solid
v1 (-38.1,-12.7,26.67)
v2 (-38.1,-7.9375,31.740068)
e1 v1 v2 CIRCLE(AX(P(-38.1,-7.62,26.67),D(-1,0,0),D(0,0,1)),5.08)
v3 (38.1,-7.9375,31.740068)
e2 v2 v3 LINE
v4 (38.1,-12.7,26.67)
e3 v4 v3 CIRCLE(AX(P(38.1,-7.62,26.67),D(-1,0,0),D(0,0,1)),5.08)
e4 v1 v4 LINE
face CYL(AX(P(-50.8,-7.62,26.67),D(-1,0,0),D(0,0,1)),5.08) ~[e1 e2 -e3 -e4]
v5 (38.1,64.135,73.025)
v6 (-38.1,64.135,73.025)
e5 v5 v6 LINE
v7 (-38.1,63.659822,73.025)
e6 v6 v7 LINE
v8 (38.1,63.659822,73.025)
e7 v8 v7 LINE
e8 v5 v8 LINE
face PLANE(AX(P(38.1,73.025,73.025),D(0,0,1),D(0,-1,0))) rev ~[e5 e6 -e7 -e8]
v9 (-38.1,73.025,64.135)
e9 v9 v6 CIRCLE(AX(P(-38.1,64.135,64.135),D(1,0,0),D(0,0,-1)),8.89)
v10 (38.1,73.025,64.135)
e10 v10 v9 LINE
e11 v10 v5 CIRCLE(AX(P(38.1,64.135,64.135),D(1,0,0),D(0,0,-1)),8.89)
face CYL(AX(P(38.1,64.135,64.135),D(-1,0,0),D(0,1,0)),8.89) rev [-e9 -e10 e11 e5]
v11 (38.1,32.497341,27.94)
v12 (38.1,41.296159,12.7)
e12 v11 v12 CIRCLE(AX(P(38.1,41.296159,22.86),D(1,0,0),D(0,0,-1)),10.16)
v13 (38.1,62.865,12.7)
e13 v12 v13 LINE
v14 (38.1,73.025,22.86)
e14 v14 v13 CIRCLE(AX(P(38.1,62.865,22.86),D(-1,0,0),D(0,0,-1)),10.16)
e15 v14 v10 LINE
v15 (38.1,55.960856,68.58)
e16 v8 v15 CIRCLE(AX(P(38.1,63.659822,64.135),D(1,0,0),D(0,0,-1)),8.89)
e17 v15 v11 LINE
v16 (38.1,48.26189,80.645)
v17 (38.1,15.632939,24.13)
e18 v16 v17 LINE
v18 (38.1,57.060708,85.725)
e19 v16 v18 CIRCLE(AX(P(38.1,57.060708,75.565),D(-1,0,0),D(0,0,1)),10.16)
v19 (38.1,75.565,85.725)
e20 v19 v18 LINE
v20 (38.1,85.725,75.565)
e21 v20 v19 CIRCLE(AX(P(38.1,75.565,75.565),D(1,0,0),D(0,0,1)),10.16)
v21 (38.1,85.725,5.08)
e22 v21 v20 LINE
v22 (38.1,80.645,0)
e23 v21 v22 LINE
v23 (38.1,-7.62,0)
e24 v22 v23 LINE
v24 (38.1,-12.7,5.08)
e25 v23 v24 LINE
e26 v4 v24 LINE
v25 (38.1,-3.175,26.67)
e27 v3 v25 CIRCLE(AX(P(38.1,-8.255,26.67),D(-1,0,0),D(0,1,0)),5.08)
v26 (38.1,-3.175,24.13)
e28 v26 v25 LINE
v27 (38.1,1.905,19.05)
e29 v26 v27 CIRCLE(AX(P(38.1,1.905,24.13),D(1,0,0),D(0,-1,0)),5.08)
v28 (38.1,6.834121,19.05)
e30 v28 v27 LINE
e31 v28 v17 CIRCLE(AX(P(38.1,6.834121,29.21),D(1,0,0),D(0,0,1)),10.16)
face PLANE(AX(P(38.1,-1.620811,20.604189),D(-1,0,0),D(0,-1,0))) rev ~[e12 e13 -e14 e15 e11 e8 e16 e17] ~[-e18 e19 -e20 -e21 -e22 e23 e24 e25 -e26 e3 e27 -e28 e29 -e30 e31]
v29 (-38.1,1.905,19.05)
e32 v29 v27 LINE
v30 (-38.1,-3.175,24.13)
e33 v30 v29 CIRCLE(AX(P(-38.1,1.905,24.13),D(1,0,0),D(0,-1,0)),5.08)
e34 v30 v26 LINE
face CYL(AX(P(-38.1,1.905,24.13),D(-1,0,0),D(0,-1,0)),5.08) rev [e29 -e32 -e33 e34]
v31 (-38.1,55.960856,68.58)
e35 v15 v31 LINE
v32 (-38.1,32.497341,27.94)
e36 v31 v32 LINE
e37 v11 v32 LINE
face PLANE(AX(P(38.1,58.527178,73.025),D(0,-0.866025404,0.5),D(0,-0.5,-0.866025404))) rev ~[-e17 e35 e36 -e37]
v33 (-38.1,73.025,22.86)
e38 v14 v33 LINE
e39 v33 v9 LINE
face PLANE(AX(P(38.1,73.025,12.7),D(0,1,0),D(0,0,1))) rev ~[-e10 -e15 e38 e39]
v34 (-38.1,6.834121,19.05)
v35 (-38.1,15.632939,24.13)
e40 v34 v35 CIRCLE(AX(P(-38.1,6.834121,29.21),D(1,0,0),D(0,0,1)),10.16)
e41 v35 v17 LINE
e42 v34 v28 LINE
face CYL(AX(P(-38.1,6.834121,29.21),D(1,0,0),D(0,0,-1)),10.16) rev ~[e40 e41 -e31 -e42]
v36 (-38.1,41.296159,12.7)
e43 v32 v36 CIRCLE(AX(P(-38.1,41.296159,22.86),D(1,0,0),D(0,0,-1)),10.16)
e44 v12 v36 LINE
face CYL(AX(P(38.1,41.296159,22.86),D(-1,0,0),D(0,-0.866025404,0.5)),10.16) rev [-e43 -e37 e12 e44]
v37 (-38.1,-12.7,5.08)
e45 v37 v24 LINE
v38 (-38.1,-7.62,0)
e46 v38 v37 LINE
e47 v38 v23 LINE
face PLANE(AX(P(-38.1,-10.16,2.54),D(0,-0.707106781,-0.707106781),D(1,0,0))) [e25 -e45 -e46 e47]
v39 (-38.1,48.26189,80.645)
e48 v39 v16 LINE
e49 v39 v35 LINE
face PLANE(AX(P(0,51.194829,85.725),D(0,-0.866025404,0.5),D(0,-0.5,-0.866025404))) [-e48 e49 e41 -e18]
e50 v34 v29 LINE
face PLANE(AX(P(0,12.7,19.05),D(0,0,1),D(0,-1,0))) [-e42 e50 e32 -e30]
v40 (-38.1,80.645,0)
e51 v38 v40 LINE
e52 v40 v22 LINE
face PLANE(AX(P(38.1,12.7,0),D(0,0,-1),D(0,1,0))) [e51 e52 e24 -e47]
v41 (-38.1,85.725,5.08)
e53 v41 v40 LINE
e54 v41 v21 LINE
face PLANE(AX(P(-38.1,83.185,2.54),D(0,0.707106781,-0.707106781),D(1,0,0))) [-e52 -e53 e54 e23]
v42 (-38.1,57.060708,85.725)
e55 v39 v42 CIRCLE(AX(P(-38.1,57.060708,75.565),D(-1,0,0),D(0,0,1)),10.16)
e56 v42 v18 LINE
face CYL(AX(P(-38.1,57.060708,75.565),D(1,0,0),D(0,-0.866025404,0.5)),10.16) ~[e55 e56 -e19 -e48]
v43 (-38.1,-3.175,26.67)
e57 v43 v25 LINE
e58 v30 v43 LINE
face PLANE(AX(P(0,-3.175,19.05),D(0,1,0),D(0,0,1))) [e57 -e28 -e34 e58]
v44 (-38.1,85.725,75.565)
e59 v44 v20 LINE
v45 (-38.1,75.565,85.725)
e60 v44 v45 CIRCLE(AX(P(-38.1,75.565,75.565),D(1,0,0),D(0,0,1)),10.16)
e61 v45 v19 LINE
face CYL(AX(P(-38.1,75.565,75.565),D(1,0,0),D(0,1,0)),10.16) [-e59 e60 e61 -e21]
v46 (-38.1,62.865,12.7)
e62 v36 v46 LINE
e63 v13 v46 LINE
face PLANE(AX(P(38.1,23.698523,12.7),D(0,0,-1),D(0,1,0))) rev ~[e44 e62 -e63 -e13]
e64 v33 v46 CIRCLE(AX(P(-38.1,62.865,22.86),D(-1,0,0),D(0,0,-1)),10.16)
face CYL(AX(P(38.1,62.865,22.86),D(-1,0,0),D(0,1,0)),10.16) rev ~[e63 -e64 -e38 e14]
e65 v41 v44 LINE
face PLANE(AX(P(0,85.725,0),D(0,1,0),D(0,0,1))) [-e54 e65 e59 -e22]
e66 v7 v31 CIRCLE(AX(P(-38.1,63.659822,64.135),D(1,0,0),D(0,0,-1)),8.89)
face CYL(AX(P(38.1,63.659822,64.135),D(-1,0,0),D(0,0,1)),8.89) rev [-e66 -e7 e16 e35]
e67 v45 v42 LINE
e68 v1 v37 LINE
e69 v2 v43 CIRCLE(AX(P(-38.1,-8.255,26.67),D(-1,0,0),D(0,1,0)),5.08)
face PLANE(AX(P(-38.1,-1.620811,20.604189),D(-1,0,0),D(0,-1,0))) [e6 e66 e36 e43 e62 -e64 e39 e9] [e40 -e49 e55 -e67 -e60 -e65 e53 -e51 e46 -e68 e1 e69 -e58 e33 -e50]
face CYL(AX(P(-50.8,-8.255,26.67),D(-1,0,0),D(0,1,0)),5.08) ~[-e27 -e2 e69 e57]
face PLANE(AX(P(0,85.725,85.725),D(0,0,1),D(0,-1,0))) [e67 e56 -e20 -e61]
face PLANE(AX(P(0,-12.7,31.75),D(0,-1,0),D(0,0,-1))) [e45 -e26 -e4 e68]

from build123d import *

# Parameters (mm, degrees)
F1_DEPTH    = 38.1
F3_DEPTH    = 76.2
F5_DEPTH    = 76.201
F6_T1_DEPTH = 76.2
F6_T3_DEPTH = 101.6
F7_R        = 10.16
F8_SIZE     = 5.08
F9_R        = 8.89


# Not quite as in the source:
# - a fillet or chamfer that OpenCascade refuses, or shapes differently, is made with other operations: its cross-section is extruded or revolved along the edge and cut away or added


with BuildPart() as f1:
    # F0 (on Right) → F1 (new body, symmetric)
    with BuildSketch(Plane.YZ):
        Polygon((-12.7, 31.75), (-12.7, 0), (12.7, 0), (56.6940905122, 76.2), (76.2, 76.2), (76.2, 0), (85.725, 0), (85.725, 85.725), (51.1948291982, 85.725), (12.7, 19.05), (7.200738686, 9.525), (-3.175, 9.525), (-3.175, 19.05), (-3.175, 31.75), align=None)
        Polygon((12.7, 19.05), (-3.175, 19.05), (-3.175, 9.525), (7.200738686, 9.525), align=None)
    extrude(amount=F1_DEPTH, both=True)

    # F2 (on face) → F3 (join, through all)
    with BuildSketch(Plane.YZ.offset(38.1)):
        Polygon((56.6940905122, 76.2), (12.7, 0), (76.2, 0), (76.2, 76.2), align=None)
    extrude(amount=-F3_DEPTH)

    # F4 (on face) → F5 (cut, through all)
    with BuildSketch(Plane.YZ.offset(38.1)):
        Polygon((58.5271776169, 73.025), (23.6985226281, 12.7), (73.025, 12.7), (73.025, 73.025), align=None)
    extrude(amount=-F5_DEPTH, mode=Mode.SUBTRACT)

    # F6: fillet of radius 5.08 on 3 edges, made by hand

    # F6_s2 → F6_t1 (join)
    with BuildSketch(Plane.YZ.offset(-38.1)):
        with BuildLine():
            ThreePointArc((-3.175, 24.13), (-1.6871024484, 20.5378975516), (1.905, 19.05))
            Line((1.905, 19.05), (-3.175, 19.05))
            Line((-3.175, 19.05), (-3.175, 24.13))
        make_face()
    extrude(amount=F6_T1_DEPTH)

    # F6_s4 → F6_t3 (cut)
    with BuildSketch(Plane.YZ.offset(-50.8)):
        with BuildLine():
            ThreePointArc((-3.175, 26.67), (-4.6628975516, 30.2621024484), (-8.255, 31.75))
            Line((-8.255, 31.75), (-3.175, 31.75))
            Line((-3.175, 31.75), (-3.175, 26.67))
        make_face()
        with BuildLine():
            ThreePointArc((-7.62, 31.75), (-11.2121024484, 30.2621024484), (-12.7, 26.67))
            Line((-12.7, 26.67), (-12.7, 31.75))
            Line((-12.7, 31.75), (-7.62, 31.75))
        make_face()
    extrude(amount=F6_T3_DEPTH, mode=Mode.SUBTRACT)

    # F7
    f7_edges = [f1.edges().sort_by_distance(p)[0] for p in [
        (0, 12.7, 19.05),
        (0, 51.194829, 85.725),
        (0, 85.725, 85.725),
        (0, 23.698523, 12.7),
        (0, 73.025, 12.7),
    ]]
    fillet(f7_edges, radius=F7_R)

    # F8
    f8_edges = [f1.edges().sort_by_distance(p)[0] for p in [
        (0, 85.725, 0),
        (0, -12.7, 0),
    ]]
    chamfer(f8_edges, length=F8_SIZE)

    # F9
    f9_edges = [f1.edges().sort_by_distance(p)[0] for p in [
        (0, 73.025, 73.025),
        (0, 58.527178, 73.025),
    ]]
    fillet(f9_edges, radius=F9_R)


solid = f1.part
